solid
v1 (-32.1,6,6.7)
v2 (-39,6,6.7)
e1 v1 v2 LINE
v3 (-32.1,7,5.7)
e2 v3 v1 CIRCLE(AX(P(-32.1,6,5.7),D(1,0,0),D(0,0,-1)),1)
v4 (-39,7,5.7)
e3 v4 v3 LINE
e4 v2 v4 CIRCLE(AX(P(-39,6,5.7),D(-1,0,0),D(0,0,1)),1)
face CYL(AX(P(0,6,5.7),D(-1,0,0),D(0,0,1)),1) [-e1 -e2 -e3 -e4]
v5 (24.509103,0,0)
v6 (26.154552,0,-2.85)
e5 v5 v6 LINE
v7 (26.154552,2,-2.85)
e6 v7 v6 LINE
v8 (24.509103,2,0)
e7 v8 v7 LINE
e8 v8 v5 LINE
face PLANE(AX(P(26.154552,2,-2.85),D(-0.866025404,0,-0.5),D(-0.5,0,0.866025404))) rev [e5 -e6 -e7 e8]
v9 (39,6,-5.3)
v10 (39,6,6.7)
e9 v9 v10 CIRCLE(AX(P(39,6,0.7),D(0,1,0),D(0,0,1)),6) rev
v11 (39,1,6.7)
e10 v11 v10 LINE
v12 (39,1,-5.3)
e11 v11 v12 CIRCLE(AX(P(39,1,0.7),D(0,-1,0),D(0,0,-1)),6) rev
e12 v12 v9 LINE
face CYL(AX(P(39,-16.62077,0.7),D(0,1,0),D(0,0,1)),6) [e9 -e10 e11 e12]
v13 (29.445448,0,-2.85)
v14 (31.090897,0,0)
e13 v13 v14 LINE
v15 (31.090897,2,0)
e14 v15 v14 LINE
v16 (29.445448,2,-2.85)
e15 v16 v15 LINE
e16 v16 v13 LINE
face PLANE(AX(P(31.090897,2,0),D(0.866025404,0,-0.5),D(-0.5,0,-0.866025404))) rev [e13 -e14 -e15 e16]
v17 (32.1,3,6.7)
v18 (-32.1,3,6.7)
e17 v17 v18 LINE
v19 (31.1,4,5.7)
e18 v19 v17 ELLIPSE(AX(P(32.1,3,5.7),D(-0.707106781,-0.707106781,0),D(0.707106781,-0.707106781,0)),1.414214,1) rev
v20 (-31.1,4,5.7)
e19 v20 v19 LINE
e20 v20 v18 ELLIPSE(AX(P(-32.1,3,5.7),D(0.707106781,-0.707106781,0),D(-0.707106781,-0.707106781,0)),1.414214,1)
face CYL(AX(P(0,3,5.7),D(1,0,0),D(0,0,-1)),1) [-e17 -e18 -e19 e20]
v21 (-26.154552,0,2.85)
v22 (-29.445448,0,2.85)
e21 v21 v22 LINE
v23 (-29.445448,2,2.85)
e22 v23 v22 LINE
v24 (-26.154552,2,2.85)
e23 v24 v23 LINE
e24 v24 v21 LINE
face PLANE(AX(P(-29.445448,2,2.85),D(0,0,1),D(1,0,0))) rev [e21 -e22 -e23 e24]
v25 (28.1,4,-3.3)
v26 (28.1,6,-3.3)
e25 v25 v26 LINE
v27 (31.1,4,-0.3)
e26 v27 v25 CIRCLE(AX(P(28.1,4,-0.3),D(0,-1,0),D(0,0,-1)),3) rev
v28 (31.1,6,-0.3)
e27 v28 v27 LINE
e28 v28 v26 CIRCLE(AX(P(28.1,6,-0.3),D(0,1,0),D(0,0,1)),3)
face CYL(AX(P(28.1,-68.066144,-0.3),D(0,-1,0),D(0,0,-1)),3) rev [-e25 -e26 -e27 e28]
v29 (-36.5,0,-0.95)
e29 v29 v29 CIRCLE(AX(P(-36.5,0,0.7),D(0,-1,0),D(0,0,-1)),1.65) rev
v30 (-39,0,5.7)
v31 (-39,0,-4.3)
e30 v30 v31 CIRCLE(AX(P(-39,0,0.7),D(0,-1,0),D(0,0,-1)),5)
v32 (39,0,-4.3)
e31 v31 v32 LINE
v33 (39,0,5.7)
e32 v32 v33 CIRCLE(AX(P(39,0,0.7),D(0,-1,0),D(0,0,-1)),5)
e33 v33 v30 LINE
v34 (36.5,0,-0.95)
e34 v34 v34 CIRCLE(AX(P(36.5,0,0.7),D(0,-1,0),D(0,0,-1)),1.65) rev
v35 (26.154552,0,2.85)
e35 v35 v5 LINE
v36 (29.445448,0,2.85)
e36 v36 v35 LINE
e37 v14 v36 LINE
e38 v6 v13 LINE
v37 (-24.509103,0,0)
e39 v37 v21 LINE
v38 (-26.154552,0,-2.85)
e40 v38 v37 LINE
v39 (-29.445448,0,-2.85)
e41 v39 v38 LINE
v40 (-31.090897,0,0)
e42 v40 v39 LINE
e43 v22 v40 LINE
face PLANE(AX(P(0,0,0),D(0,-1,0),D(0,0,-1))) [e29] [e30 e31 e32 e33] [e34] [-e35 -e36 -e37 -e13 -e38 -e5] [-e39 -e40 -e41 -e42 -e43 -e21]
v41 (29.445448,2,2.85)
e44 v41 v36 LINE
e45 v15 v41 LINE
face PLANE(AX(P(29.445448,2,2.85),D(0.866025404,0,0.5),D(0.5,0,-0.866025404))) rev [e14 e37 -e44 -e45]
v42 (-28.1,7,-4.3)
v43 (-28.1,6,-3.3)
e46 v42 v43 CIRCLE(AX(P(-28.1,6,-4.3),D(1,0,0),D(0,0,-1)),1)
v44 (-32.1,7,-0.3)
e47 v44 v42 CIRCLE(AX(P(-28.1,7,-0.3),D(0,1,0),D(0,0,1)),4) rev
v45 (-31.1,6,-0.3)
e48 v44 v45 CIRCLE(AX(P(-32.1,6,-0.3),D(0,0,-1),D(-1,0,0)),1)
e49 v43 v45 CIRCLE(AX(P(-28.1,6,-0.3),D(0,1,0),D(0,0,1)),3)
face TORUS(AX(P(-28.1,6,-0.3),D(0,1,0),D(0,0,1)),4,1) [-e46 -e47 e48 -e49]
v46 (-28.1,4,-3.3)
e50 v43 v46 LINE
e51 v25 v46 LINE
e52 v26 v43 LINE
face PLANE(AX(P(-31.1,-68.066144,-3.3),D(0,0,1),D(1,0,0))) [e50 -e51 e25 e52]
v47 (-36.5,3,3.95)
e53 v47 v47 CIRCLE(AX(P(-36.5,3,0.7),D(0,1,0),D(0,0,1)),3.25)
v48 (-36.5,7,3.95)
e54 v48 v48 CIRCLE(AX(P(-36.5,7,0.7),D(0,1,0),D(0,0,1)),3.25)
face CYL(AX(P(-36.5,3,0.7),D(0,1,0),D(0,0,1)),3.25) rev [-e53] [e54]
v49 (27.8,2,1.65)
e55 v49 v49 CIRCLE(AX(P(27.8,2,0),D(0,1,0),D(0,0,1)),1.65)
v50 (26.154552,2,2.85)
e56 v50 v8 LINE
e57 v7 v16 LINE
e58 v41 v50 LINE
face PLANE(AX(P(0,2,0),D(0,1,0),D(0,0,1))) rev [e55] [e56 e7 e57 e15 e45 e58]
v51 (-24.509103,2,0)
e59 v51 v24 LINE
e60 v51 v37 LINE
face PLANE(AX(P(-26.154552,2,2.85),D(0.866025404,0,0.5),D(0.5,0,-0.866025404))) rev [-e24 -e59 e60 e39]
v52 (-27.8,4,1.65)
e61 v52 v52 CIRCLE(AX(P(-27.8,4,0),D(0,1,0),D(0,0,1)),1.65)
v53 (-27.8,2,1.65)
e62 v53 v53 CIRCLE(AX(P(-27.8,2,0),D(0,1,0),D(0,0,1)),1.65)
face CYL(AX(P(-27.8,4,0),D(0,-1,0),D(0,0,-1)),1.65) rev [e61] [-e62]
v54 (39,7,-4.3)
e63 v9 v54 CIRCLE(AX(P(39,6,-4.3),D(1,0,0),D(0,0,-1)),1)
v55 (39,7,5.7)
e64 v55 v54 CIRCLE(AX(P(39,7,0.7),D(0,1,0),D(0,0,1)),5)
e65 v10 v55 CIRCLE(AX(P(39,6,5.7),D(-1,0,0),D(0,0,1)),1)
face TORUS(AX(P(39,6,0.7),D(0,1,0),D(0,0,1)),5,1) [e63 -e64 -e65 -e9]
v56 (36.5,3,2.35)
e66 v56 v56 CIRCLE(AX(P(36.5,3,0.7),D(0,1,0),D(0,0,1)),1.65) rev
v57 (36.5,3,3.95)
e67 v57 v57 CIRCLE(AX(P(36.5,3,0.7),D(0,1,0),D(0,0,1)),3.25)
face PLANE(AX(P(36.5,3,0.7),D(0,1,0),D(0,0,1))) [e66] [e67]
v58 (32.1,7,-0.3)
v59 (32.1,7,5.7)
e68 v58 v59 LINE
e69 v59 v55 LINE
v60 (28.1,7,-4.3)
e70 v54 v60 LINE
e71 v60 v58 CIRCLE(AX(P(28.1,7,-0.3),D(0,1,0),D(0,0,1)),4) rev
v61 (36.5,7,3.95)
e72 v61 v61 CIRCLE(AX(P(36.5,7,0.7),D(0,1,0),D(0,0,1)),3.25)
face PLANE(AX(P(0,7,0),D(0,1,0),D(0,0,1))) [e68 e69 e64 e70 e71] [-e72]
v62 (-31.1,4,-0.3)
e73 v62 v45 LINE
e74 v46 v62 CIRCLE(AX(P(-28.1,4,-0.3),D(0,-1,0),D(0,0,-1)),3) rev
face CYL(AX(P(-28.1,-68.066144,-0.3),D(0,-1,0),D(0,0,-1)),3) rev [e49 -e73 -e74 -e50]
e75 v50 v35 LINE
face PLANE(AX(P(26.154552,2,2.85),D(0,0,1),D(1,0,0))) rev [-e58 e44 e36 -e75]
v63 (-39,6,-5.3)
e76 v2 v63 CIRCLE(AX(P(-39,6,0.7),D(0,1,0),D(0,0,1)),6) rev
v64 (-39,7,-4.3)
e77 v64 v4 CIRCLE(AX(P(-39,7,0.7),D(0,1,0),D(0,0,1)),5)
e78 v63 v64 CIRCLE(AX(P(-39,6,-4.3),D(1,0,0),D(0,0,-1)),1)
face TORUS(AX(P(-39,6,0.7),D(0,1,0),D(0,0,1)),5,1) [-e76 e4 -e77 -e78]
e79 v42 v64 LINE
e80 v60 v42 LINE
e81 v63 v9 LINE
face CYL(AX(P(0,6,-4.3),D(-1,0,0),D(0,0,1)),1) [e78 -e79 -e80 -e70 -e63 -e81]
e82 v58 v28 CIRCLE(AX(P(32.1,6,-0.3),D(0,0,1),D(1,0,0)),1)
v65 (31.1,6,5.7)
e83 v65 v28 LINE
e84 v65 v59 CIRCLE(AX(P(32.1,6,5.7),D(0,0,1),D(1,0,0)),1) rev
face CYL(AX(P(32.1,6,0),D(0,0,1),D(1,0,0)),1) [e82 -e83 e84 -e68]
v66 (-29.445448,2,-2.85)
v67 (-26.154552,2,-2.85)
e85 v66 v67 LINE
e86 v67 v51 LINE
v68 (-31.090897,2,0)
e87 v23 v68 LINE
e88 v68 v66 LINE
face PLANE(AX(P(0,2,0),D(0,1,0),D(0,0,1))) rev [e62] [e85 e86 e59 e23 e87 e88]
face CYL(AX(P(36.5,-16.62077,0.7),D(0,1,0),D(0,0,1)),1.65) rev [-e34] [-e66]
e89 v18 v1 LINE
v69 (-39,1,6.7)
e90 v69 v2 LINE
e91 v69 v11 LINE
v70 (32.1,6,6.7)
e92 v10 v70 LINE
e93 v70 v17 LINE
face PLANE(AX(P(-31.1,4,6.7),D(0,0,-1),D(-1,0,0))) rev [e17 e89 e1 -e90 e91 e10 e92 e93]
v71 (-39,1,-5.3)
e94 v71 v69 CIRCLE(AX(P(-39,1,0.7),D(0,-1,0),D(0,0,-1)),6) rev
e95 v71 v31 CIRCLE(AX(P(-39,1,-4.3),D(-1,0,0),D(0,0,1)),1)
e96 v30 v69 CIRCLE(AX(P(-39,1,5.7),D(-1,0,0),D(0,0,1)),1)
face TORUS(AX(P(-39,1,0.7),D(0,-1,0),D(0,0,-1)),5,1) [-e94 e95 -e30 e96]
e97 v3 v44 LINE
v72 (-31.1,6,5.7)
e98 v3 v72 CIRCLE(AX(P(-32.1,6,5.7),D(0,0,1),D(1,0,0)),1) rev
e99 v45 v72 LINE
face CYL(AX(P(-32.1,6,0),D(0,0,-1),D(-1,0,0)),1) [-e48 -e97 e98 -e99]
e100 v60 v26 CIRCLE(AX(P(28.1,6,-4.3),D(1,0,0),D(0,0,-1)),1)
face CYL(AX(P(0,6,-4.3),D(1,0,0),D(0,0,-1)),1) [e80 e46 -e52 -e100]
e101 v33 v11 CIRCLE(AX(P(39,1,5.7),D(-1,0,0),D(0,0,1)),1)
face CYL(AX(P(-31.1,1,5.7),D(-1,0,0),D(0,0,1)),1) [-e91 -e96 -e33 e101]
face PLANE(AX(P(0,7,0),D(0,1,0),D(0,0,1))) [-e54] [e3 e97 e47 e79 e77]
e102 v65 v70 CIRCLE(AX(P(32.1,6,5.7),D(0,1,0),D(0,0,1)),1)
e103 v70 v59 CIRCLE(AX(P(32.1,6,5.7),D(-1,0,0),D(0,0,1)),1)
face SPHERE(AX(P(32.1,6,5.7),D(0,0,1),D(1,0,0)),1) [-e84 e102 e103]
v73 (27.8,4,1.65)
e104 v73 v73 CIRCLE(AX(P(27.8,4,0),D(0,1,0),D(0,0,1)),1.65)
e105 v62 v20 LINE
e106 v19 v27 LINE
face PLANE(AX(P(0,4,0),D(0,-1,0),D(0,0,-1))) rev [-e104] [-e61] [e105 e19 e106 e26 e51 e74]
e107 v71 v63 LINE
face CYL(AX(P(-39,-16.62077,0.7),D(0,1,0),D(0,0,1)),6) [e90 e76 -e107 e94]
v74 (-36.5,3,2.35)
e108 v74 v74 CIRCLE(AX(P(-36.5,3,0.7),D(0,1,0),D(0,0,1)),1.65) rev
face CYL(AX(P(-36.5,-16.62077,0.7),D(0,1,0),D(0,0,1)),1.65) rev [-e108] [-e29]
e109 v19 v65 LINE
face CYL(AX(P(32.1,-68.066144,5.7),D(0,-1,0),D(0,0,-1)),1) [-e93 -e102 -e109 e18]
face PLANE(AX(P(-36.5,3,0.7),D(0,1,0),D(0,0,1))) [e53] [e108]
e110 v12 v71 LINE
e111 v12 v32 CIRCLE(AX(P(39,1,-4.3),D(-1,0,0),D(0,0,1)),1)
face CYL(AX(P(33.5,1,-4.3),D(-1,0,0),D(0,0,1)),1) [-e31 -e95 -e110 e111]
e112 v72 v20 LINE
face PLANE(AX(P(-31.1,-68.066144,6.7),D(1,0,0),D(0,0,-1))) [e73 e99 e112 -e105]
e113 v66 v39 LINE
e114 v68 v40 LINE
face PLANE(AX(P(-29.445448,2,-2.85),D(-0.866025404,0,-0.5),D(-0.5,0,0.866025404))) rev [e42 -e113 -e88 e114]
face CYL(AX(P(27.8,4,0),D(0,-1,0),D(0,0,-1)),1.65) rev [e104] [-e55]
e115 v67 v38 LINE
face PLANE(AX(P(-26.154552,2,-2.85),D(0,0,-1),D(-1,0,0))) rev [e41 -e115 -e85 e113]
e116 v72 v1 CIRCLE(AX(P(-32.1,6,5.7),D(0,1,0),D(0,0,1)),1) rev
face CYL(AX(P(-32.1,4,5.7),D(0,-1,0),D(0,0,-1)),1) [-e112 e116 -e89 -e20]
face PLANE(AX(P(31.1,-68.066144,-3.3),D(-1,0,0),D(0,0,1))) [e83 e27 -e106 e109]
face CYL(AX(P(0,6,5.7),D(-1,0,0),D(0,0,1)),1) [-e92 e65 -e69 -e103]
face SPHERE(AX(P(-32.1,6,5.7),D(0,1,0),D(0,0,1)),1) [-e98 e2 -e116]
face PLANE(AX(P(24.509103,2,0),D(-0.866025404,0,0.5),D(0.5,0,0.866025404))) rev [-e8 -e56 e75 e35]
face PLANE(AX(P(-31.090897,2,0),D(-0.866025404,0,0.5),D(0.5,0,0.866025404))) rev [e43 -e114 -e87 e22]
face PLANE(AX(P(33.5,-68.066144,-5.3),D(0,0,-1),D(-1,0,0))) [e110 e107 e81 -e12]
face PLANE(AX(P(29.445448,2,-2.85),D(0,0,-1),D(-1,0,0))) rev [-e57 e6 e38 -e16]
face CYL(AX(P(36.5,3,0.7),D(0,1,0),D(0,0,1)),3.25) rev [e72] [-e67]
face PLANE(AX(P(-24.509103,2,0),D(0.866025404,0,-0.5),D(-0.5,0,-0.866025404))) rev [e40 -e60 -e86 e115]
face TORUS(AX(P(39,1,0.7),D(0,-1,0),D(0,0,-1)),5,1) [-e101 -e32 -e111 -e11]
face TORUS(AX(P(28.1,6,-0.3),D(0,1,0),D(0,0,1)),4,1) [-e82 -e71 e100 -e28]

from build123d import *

# Parameters (mm, degrees)
ESQUISSE1_W             = 62.2
ESQUISSE1_H             = 10
ESQUISSE1_R             = 1.65
BOSS_EXTRU_1_DEPTH      = 4
BOSS_EXTRU_2_DEPTH      = 3
BOSS_EXTRU_2_DEPTH_BACK = 4
CONG_1_R                = 3
ESQUISSE3_R             = 1.65
BOSS_EXTRU_3_DEPTH      = 7
ENL_V_MAT_EXTRU_1_DEPTH = 2
ESQUISSE6_R             = 3.25
ENL_V_MAT_EXTRU_2_DEPTH = 4
CONG_2_R                = 1


with BuildPart() as part:
    # Esquisse1 → Boss.-Extru.1 (new body)
    with BuildSketch(Plane(origin=(0, 0, 0), x_dir=(1, 0, 0), z_dir=(0, 1, 0))):
        with Locations((0, -1.7)):
            Rectangle(ESQUISSE1_W, ESQUISSE1_H)
        with Locations(Location((-27.8, 0, 0), (0, 0, 270))):
            Circle(ESQUISSE1_R, mode=Mode.SUBTRACT)
        with Locations(Location((27.8, 0, 0), (0, 0, 270))):
            Circle(ESQUISSE1_R, mode=Mode.SUBTRACT)
    extrude(amount=BOSS_EXTRU_1_DEPTH)

    # Esquisse2 → Boss.-Extru.2 (add, two sides: drawn at the far end of the back side and taken through both)
    with BuildSketch(Plane(origin=(0, 4, 0), x_dir=(1, 0, 0), z_dir=(0, 1, 0)).offset(-BOSS_EXTRU_2_DEPTH_BACK)):
        Polygon((-31.1, -6.7), (-31.1, 3.3), (31.1, 3.3), (31.1, -6.7), (33.5, -6.7), (33.5, 5.3), (-33.5, 5.3), (-33.5, -6.7), align=None)
    extrude(amount=BOSS_EXTRU_2_DEPTH + BOSS_EXTRU_2_DEPTH_BACK)

    # Congé1
    cong_1_edges = [part.edges().sort_by_distance(p)[0] for p in [
        (31.1, 5.5, -3.3),
        (-31.1, 5.5, -3.3),
    ]]
    fillet(cong_1_edges, radius=CONG_1_R)

    # Esquisse3 → Boss.-Extru.3 (add)
    # profile 1 of 2: a face of its own
    with BuildSketch(Plane(origin=(0, 7, 0), x_dir=(1, 0, 0), z_dir=(0, 1, 0))):
        with BuildLine():
            Line((-39, 5.3), (-33.5, 5.3))
            Line((-33.5, 5.3), (-33.5, -6.7))
            Line((-33.5, -6.7), (-39, -6.7))
            ThreePointArc((-39, -6.7), (-45, -0.7), (-39, 5.3))
        make_face()
        with Locations(Location((-36.5, -0.7, 0), (0, 0, 270))):
            Circle(ESQUISSE3_R, mode=Mode.SUBTRACT)
    # profile 2 of 2: a face of its own
    with BuildSketch(Plane(origin=(0, 7, 0), x_dir=(1, 0, 0), z_dir=(0, 1, 0))):
        with BuildLine():
            Line((33.5, 5.3), (33.5, -6.7))
            Line((33.5, -6.7), (39, -6.7))
            ThreePointArc((39, -6.7), (45, -0.7), (39, 5.3))
            Line((39, 5.3), (33.5, 5.3))
        make_face()
        with Locations(Location((36.5, -0.7, 0), (0, 0, 90))):
            Circle(ESQUISSE3_R, mode=Mode.SUBTRACT)
    extrude(amount=-BOSS_EXTRU_3_DEPTH)

    # Esquisse5 → Enlèv. mat.-Extru.1 (cut)
    with BuildSketch(Plane.XZ):
        Polygon((-29.445448267, 2.85), (-26.154551733, 2.85), (-24.509103466, 0), (-26.154551733, -2.85), (-29.445448267, -2.85), (-31.090896534, 0), align=None)
        Polygon((26.154551733, 2.85), (29.445448267, 2.85), (31.090896534, 0), (29.445448267, -2.85), (26.154551733, -2.85), (24.509103466, 0), align=None)
    extrude(amount=-ENL_V_MAT_EXTRU_1_DEPTH, mode=Mode.SUBTRACT)

    # Esquisse6 → Enlèv. mat.-Extru.2 (cut)
    with BuildSketch(Plane(origin=(0, 7, 0), x_dir=(1, 0, 0), z_dir=(0, 1, 0))):
        with Locations(Location((-36.5, -0.7, 0), (0, 0, 270))):
            Circle(ESQUISSE6_R)
        with Locations(Location((36.5, -0.7, 0), (0, 0, 270))):
            Circle(ESQUISSE6_R)
    extrude(amount=-ENL_V_MAT_EXTRU_2_DEPTH, mode=Mode.SUBTRACT)

    # Congé2
    cong_2_edges = [part.edges().sort_by_distance(p)[0] for p in [
        (0, 4, 6.7),
        (31.1, 5.5, 6.7),
        (0, 0, -5.3),
        (-31.1, 5.5, 6.7),
        (-35.05, 7, 6.7),
        (-31.1, 7, 3.2),
        (35.05, 7, 6.7),
        (0, 7, -5.3),
        (0, 7, -3.3),
        (31.1, 7, 3.2),
        (0, 0, 6.7),
        (30.221320344, 7, -2.421320344),
        (-30.221320344, 7, -2.421320344),
        (-45, 0, 0.7),
        (-45, 7, 0.7),
        (45, 0, 0.7),
        (45, 7, 0.7),
    ]]
    fillet(cong_2_edges, radius=CONG_2_R - 0.0001)  # a hair under: the kernel refuses the full size


solid = part.part
